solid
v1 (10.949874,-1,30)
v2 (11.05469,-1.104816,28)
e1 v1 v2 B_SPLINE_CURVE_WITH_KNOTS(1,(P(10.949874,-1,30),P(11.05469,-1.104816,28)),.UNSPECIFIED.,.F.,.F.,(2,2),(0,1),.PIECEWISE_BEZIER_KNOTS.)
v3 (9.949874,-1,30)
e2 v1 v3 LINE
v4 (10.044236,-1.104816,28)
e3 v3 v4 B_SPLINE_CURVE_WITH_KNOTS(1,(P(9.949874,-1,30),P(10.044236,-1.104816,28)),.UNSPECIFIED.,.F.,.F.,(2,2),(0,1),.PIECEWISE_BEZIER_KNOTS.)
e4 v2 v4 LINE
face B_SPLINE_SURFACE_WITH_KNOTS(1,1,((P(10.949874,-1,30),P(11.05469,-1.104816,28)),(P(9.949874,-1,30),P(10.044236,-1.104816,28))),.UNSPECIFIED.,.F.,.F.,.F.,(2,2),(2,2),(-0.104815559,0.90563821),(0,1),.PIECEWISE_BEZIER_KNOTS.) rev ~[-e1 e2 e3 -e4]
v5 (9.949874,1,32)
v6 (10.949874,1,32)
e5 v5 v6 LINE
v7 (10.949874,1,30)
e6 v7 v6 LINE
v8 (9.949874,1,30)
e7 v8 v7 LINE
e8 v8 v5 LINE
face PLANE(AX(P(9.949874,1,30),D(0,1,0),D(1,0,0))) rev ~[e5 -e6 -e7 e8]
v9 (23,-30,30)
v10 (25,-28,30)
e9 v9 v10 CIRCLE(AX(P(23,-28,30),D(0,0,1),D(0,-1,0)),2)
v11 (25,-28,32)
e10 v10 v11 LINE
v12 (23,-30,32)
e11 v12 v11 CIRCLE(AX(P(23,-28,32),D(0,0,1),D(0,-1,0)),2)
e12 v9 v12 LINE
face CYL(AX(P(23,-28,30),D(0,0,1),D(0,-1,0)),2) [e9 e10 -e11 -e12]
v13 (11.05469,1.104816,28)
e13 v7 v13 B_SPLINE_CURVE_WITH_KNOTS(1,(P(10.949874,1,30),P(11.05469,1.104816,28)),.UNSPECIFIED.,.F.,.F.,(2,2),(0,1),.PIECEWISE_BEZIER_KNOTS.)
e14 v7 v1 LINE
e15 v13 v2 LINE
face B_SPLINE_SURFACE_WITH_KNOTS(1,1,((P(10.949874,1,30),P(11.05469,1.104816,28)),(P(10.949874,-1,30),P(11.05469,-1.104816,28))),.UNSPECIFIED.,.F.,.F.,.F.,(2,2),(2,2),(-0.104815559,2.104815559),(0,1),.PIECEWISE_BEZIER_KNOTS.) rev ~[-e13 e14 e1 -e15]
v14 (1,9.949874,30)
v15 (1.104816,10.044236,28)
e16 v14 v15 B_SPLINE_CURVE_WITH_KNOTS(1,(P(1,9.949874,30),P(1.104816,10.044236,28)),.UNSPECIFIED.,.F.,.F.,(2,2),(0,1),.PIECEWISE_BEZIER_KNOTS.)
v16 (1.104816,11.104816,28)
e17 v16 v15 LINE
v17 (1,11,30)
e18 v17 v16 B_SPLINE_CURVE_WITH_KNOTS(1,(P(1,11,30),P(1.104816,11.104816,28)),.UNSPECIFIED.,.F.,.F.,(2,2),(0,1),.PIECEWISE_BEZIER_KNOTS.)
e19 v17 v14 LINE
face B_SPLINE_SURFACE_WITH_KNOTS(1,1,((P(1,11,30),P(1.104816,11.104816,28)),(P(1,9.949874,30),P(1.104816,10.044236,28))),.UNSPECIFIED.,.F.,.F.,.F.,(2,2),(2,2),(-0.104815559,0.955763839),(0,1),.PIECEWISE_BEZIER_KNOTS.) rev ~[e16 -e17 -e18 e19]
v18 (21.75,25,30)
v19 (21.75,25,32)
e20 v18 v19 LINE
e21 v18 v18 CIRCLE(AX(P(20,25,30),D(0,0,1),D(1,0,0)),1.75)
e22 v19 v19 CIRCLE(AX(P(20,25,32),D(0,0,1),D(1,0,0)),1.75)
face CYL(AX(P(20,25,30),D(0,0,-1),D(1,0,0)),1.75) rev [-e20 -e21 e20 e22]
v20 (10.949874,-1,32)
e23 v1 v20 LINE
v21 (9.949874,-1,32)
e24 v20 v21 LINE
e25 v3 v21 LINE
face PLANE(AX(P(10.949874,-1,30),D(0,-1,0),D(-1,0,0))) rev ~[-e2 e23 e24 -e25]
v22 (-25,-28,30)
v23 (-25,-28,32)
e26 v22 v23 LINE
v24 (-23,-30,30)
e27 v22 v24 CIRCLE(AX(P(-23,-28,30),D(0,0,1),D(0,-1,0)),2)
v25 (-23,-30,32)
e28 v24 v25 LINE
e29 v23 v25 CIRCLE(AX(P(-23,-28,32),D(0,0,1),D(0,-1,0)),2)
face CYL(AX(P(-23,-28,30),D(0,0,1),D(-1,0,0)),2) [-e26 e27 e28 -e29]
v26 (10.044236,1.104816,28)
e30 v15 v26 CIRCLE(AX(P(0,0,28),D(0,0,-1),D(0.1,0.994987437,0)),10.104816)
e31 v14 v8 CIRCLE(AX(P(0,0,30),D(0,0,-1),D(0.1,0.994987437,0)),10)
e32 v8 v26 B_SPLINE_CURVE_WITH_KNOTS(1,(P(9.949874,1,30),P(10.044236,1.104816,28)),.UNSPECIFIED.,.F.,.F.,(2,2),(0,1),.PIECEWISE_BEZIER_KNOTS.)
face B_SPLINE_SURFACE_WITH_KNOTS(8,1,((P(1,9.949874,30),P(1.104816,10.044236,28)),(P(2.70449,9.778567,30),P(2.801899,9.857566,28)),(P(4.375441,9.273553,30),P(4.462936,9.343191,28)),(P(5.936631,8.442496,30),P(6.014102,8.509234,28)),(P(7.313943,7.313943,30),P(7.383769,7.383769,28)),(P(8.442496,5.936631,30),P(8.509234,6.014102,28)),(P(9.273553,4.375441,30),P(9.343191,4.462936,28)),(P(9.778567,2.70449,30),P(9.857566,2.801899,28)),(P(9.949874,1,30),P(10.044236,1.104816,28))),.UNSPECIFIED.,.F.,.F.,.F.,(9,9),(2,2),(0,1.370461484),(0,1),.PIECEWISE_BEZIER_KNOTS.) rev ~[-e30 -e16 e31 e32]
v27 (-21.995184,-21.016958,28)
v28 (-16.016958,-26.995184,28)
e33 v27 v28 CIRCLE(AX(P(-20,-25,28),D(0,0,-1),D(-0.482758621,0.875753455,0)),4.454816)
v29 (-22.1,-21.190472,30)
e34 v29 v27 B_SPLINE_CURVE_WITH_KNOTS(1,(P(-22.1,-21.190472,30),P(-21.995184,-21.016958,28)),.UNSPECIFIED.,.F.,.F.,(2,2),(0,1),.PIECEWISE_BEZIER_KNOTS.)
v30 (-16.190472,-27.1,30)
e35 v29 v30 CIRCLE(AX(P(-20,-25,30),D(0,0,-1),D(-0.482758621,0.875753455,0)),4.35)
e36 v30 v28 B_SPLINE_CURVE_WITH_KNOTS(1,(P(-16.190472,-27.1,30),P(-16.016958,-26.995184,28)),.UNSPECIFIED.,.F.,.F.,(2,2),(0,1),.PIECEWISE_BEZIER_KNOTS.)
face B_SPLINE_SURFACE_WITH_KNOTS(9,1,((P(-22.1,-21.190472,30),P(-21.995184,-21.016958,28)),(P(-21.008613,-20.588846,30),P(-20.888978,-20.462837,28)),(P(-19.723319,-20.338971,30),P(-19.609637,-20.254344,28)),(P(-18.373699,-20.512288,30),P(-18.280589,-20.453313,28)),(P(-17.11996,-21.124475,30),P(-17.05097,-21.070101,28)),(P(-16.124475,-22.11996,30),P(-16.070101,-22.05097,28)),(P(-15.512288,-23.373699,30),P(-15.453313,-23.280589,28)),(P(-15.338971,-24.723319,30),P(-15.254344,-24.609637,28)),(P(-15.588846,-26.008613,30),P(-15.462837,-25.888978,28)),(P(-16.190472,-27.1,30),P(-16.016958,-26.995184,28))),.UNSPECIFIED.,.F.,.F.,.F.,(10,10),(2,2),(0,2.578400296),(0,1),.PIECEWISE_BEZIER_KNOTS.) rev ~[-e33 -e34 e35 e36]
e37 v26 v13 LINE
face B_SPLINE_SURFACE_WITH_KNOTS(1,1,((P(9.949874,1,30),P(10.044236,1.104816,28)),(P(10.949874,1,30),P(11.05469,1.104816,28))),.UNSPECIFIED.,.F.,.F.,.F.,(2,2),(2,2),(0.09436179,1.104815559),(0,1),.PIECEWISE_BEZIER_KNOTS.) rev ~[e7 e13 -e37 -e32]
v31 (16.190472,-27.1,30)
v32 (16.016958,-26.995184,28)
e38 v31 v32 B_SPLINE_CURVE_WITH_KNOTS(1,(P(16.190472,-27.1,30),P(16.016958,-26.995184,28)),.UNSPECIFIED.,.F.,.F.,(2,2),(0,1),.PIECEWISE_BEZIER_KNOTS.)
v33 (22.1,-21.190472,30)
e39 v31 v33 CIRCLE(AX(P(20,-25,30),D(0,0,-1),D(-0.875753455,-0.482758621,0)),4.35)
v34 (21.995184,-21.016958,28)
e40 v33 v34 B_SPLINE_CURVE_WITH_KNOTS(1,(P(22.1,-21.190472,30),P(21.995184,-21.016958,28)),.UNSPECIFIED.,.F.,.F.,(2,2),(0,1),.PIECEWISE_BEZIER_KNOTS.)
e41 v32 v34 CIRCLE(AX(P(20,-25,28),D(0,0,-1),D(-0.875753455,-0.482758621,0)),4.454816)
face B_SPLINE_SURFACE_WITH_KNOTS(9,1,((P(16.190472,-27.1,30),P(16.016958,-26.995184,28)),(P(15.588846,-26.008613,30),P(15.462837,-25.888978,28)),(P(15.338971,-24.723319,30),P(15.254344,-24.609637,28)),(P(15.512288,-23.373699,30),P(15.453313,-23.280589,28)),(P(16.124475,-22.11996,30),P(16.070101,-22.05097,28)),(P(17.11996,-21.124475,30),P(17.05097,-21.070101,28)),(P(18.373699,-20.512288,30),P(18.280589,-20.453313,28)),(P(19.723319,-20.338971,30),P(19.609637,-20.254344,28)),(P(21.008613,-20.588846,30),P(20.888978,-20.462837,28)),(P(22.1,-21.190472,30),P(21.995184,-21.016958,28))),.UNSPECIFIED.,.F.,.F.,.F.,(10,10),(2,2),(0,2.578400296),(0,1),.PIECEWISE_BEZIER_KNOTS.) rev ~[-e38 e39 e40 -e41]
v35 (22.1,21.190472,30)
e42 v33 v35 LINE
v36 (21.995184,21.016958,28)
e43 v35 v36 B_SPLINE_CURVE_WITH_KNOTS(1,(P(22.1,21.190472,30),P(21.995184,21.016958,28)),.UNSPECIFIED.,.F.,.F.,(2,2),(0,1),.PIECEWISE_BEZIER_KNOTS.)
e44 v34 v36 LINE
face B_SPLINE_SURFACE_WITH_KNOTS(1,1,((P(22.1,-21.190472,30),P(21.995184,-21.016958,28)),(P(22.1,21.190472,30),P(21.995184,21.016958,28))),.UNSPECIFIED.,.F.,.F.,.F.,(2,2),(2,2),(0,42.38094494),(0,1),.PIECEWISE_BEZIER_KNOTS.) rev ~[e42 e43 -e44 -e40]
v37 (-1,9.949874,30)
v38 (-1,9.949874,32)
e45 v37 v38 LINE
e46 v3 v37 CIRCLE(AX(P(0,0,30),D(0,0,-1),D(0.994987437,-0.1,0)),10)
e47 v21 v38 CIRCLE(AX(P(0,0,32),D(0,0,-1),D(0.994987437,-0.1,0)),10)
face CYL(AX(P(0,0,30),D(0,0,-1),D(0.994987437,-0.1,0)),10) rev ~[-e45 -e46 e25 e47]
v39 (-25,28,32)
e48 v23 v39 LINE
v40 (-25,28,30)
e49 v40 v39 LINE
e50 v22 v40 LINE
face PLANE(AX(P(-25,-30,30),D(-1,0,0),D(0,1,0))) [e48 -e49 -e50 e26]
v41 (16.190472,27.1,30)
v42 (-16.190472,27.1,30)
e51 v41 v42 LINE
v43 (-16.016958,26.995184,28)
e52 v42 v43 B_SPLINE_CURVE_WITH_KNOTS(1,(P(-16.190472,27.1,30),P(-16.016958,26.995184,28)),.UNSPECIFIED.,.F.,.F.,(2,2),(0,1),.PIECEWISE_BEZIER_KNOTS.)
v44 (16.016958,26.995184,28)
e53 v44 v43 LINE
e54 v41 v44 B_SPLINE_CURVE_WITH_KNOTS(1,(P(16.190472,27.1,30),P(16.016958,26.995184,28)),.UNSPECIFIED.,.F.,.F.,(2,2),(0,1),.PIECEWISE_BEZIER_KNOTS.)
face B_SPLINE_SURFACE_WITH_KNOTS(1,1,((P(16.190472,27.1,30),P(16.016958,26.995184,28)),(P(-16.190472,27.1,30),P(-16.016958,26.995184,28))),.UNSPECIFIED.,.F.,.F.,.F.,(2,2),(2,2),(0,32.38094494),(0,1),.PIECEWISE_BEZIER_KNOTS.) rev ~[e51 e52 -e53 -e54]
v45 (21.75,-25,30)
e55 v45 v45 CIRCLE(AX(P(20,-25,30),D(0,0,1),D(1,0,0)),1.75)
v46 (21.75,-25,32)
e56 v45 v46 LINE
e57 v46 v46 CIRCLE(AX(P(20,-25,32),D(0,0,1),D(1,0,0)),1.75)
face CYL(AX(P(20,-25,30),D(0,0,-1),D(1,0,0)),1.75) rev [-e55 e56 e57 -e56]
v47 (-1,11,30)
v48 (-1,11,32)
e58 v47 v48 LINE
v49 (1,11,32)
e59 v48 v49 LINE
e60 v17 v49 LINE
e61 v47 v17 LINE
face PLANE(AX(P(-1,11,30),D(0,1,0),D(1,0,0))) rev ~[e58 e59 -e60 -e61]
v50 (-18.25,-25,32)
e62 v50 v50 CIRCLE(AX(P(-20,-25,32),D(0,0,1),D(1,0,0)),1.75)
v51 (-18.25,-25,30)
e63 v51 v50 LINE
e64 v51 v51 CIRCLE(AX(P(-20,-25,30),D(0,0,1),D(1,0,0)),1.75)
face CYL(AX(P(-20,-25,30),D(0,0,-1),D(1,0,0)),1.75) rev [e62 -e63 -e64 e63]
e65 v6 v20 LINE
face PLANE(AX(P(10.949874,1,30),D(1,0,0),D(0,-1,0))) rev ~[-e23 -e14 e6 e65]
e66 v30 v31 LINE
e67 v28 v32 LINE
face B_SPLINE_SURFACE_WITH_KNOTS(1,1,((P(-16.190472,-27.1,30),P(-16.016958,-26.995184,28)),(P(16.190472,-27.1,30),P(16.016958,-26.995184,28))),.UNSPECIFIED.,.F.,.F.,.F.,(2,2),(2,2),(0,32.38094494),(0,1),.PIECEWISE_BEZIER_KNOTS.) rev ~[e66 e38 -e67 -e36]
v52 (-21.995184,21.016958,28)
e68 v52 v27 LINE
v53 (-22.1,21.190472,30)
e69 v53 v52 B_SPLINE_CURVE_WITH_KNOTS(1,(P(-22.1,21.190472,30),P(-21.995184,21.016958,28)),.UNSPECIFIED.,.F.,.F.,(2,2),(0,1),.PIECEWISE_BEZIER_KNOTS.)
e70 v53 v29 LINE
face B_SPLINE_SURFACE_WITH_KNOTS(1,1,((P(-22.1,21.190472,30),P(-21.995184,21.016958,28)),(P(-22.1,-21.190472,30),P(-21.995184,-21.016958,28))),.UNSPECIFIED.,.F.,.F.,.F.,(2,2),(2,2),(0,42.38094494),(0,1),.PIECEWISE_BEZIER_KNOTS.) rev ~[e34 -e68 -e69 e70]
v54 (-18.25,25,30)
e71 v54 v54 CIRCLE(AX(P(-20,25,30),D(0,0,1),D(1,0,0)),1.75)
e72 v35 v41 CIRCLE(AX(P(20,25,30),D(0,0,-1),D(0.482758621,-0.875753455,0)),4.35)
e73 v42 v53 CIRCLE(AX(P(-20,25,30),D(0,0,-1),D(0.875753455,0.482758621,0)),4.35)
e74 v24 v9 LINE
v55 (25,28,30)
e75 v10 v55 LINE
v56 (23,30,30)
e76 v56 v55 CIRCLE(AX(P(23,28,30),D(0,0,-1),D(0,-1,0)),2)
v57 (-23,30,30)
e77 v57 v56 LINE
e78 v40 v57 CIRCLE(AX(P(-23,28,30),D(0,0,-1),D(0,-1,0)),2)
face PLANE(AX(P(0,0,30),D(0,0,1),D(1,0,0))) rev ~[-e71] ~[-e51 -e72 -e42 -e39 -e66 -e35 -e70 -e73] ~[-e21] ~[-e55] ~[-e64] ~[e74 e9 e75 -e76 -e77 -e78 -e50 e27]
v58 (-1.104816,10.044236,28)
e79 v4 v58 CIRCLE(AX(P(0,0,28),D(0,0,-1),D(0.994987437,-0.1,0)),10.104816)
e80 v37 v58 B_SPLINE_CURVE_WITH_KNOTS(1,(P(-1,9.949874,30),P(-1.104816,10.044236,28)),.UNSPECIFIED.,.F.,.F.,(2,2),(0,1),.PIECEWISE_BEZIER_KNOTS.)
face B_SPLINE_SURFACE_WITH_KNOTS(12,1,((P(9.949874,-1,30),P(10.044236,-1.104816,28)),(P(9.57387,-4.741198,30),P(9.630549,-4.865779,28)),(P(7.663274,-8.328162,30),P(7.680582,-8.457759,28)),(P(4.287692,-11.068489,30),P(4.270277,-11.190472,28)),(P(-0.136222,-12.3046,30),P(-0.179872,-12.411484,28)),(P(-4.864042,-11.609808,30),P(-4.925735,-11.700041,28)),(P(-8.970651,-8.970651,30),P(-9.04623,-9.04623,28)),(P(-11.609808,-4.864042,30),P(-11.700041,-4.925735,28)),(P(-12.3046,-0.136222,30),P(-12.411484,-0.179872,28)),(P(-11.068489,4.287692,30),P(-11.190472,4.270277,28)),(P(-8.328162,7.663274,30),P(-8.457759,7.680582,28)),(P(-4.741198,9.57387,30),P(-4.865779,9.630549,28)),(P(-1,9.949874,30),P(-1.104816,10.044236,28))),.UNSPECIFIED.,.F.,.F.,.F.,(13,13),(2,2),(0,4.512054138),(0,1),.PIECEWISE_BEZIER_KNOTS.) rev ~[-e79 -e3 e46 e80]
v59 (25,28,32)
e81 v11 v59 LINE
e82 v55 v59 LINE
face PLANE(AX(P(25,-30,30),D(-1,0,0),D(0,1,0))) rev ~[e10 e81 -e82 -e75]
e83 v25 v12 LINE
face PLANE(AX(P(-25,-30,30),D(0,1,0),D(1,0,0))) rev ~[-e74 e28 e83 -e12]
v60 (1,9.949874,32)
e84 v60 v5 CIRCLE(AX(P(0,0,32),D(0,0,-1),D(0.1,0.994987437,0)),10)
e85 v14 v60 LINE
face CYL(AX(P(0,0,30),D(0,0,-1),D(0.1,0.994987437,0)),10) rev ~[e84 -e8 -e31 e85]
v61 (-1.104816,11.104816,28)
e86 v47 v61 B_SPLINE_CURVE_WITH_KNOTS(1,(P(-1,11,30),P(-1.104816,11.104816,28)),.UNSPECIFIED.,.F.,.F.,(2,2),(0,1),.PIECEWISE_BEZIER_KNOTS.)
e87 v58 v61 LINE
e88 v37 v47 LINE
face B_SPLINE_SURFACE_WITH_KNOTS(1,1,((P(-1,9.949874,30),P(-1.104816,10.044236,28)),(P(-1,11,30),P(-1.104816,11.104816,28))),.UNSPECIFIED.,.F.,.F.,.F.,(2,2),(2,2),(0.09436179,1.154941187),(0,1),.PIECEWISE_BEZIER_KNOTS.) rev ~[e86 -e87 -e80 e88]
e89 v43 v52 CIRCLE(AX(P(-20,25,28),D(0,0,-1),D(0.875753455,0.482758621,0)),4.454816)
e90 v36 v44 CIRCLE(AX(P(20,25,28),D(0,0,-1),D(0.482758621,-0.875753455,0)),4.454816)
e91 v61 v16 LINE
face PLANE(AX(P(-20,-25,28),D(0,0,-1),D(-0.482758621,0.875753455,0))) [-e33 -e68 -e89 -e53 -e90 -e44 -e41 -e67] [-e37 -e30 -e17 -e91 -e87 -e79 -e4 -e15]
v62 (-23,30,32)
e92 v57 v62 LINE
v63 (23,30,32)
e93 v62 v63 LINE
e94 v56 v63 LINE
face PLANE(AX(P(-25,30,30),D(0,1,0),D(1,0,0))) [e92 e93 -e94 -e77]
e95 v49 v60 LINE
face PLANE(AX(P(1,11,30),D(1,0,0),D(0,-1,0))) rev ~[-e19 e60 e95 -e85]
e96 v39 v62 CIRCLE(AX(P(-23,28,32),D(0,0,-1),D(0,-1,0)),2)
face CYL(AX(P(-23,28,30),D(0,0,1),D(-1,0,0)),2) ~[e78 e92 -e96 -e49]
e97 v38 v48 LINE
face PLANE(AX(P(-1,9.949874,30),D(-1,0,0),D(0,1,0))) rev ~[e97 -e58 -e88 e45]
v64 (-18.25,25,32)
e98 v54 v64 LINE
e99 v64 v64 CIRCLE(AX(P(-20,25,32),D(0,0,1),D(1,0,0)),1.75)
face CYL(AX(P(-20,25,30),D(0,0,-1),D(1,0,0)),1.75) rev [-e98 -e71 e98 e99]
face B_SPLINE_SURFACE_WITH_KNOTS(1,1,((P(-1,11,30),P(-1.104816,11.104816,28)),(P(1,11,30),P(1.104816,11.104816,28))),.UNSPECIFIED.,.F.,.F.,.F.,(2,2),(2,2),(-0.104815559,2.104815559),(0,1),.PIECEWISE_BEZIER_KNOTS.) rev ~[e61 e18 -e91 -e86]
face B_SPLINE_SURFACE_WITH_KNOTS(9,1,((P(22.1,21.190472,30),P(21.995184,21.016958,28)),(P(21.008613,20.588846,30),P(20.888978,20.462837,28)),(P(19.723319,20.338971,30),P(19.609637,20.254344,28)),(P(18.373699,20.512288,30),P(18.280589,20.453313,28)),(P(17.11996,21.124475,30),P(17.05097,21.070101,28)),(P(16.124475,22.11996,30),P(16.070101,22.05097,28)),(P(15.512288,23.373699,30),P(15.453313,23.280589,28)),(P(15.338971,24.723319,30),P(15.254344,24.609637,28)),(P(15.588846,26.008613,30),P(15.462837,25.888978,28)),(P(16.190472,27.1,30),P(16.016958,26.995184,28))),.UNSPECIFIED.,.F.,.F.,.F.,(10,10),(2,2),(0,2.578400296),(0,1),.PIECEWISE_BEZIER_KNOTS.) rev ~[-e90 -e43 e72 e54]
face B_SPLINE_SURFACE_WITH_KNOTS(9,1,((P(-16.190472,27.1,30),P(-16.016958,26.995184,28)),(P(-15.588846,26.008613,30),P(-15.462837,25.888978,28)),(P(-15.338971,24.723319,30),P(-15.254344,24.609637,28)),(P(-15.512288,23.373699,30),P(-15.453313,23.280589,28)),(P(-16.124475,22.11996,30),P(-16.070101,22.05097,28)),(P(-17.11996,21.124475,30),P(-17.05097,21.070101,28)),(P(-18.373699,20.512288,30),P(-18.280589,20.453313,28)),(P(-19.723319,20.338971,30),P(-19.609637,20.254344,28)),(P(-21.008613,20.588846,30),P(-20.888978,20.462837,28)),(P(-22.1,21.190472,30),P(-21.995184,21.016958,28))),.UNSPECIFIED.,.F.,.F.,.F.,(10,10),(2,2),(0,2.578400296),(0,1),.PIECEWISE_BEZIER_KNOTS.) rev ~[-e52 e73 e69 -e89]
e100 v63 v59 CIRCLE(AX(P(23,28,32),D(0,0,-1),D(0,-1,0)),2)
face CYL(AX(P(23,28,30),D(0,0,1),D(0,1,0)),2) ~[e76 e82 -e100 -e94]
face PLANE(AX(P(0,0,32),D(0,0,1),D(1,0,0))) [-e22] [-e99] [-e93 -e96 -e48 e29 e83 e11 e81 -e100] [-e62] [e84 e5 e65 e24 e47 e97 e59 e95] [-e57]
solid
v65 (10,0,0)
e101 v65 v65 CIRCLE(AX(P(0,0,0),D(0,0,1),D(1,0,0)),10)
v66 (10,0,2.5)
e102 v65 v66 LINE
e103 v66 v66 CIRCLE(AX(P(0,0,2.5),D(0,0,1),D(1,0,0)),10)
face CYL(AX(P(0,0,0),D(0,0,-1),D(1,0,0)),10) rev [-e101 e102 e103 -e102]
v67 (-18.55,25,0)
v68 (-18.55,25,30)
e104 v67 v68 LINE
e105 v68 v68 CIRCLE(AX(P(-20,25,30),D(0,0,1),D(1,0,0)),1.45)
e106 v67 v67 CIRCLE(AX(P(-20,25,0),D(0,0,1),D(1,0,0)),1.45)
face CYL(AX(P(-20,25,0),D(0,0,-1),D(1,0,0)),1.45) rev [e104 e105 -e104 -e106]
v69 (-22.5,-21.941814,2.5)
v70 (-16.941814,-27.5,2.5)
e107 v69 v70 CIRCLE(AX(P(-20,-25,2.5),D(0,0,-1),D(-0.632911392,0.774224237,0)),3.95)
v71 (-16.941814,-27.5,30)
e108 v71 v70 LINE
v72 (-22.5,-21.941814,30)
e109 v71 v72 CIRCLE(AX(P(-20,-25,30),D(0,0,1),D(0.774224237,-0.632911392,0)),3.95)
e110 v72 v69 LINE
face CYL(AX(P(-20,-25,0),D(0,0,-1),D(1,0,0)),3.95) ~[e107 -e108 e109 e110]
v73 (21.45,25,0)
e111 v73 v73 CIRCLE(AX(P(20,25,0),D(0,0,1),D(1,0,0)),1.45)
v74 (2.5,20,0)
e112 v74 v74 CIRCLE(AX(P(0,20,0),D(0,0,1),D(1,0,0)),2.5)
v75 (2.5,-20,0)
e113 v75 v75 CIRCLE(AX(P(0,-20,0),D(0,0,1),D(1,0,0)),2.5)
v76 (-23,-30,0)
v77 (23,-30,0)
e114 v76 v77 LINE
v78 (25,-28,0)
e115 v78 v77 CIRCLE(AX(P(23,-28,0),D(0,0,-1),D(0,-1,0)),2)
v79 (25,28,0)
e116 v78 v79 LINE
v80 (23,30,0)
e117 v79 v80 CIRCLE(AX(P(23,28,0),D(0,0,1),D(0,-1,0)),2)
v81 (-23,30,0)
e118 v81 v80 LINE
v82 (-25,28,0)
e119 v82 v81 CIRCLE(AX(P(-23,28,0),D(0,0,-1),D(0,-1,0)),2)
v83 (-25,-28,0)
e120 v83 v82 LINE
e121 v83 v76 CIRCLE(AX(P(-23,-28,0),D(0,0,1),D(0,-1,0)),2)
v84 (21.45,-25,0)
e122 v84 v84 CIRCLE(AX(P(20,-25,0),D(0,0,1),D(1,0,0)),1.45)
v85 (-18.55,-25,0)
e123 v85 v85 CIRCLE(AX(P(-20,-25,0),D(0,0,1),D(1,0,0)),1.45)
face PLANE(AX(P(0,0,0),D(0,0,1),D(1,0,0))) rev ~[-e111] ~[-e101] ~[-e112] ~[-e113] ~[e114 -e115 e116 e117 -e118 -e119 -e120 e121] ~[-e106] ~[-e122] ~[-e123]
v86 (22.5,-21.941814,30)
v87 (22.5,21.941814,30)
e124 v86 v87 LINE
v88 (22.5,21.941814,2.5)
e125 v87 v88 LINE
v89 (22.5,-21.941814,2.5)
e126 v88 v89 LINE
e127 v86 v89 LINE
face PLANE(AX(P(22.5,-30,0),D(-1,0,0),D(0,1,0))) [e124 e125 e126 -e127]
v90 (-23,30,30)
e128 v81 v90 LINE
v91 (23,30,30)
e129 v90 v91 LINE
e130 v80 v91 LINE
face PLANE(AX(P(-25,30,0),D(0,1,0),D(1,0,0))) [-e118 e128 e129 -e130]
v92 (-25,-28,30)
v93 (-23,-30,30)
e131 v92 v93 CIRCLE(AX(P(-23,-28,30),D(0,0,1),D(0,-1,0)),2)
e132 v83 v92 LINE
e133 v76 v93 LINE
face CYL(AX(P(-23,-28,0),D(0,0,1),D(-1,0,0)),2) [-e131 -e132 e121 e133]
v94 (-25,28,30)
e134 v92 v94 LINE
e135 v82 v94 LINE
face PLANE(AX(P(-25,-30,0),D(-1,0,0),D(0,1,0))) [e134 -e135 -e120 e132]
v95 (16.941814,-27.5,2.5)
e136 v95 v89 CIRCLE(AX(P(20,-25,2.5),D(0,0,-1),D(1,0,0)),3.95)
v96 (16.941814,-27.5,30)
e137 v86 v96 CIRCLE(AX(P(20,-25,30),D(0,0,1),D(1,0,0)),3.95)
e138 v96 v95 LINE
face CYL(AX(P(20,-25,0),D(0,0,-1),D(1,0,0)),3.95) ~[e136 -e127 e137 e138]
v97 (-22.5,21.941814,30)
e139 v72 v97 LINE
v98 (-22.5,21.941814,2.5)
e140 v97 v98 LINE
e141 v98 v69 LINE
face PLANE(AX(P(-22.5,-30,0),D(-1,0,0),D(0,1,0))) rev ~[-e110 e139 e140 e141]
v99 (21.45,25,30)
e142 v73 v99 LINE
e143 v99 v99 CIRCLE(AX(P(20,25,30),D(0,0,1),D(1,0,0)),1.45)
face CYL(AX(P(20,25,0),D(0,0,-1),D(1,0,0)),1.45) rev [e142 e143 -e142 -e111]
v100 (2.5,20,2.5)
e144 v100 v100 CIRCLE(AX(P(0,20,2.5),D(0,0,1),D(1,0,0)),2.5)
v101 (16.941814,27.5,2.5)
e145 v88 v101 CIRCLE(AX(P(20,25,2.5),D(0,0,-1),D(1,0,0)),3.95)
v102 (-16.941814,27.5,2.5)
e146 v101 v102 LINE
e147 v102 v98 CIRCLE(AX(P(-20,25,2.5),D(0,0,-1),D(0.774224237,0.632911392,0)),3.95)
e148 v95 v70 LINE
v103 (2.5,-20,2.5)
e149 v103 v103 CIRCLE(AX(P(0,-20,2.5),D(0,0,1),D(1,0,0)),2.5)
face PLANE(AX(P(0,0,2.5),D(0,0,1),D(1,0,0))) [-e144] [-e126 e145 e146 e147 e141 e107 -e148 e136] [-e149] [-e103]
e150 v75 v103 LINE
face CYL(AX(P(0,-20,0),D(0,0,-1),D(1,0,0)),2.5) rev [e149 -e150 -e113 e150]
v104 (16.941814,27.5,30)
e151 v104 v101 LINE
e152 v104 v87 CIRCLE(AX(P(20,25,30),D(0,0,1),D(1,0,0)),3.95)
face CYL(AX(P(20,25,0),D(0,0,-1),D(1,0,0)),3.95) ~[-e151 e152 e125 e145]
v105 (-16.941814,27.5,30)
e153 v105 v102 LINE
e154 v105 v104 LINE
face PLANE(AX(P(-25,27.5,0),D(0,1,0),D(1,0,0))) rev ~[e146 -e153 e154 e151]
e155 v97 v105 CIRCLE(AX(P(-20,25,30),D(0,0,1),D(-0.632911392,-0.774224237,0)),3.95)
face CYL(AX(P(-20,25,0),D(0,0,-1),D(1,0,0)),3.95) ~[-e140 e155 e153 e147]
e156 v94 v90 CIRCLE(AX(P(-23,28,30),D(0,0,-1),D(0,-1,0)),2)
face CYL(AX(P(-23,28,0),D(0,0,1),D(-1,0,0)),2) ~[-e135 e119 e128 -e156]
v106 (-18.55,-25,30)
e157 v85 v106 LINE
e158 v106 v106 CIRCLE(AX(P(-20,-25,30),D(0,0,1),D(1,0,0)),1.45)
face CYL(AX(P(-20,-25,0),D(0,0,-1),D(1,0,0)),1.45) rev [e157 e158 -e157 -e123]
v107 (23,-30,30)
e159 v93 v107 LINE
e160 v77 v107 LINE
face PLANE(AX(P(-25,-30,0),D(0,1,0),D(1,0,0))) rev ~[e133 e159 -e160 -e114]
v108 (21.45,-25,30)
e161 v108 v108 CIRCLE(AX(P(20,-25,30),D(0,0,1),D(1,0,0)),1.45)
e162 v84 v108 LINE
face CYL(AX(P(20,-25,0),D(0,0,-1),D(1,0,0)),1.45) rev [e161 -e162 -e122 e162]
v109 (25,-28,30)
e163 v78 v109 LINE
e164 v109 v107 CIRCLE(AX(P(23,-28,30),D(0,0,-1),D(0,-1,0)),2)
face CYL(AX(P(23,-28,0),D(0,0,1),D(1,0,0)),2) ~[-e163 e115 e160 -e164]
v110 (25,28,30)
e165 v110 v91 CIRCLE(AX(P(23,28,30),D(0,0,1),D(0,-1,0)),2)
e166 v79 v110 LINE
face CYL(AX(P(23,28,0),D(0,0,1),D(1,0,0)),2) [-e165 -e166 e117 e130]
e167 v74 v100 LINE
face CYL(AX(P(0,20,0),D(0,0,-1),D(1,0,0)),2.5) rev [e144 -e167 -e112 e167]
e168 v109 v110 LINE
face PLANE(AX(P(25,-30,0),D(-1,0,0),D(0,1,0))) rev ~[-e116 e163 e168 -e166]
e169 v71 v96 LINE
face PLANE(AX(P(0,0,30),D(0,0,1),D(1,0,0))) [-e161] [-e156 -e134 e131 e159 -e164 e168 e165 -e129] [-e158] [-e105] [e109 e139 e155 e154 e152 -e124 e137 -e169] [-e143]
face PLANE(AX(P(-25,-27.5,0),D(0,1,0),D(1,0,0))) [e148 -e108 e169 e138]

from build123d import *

# Parameters (mm, degrees)
F0_W     = 50
F0_H     = 60
F0_R     = 1.45
F0_R_2   = 2.5
F0_R_3   = 10
F1_DEPTH = 30
F2_T     = -2.5
F4_DEPTH = 2
F4_TAPER = 3
F3_W     = 50
F3_H     = 60
F3_R     = 1.75
F5_DEPTH = 2
F6_R     = 2
F6_2_R   = 2


with BuildPart() as f1:
    # F0 (on Top) → F1 (new body)
    with BuildSketch(Plane.XY):
        Rectangle(F0_W, F0_H)
        with Locations((-20, -25)):
            Circle(F0_R, mode=Mode.SUBTRACT)
        with Locations((0, -20)):
            Circle(F0_R_2, mode=Mode.SUBTRACT)
        with Locations((20, -25)):
            Circle(F0_R, mode=Mode.SUBTRACT)
        with Locations((-20, 25)):
            Circle(F0_R, mode=Mode.SUBTRACT)
        Circle(F0_R_3, mode=Mode.SUBTRACT)
        with Locations((0, 20)):
            Circle(F0_R_2, mode=Mode.SUBTRACT)
        with Locations((20, 25)):
            Circle(F0_R, mode=Mode.SUBTRACT)
    extrude(amount=F1_DEPTH)

    # F2
    f2_openings = [f1.faces().sort_by_distance(p)[0] for p in [
        (-10, 0, 15),
        (0, -29.218975, 30),
        (-2.5, 20, 15),
        (-2.5, -20, 15),
    ]]
    offset(amount=F2_T, openings=f2_openings)

    # F6
    f6_edges = [f1.edges().sort_by_distance(p)[0] for p in [
        (25, 30, 15),
        (25, -30, 15),
        (-25, 30, 15),
        (-25, -30, 15),
    ]]
    fillet(f6_edges, radius=F6_R)


with BuildPart() as f4:
    # F3 (on face) → F4 (new body)
    with BuildSketch(Plane.XY.offset(30)):
        with BuildLine():
            ThreePointArc((-22.1, -21.1904724702), (-16.9240855018, -21.9240855018), (-16.1904724702, -27.1))
            Line((-16.1904724702, -27.1), (16.1904724702, -27.1))
            ThreePointArc((16.1904724702, -27.1), (16.9240855018, -21.9240855018), (22.1, -21.1904724702))
            Line((22.1, -21.1904724702), (22.1, 21.1904724702))
            ThreePointArc((22.1, 21.1904724702), (16.9240855018, 21.9240855018), (16.1904724702, 27.1))
            Line((16.1904724702, 27.1), (-16.1904724702, 27.1))
            ThreePointArc((-16.1904724702, 27.1), (-16.9240855018, 21.9240855018), (-22.1, 21.1904724702))
            Line((-22.1, 21.1904724702), (-22.1, -21.1904724702))
        make_face()
        with BuildLine():
            ThreePointArc((9.9498743711, -1), (-7.0710678119, -7.0710678119), (-1, 9.9498743711))
            Line((-1, 9.9498743711), (-1, 11))
            Line((-1, 11), (1, 11))
            Line((1, 11), (1, 9.9498743711))
            ThreePointArc((1, 9.9498743711), (7.0710678119, 7.0710678119), (9.9498743711, 1))
            Line((9.9498743711, 1), (10.9498743711, 1))
            Line((10.9498743711, 1), (10.9498743711, -1))
            Line((10.9498743711, -1), (9.9498743711, -1))
        make_face(mode=Mode.SUBTRACT)
    extrude(amount=-F4_DEPTH, taper=F4_TAPER)

    # F3 (on face) → F5 (join)
    with BuildSketch(Plane.XY.offset(30)):
        Rectangle(F3_W, F3_H)
        with Locations((-20, -25)):
            Circle(F3_R, mode=Mode.SUBTRACT)
        with Locations((20, -25)):
            Circle(F3_R, mode=Mode.SUBTRACT)
        with Locations((-20, 25)):
            Circle(F3_R, mode=Mode.SUBTRACT)
        with BuildLine():
            ThreePointArc((-16.05, -25), (-18.3077381999, -21.4308614485), (-22.5, -21.9418142633))
            Line((-22.5, -21.9418142633), (-22.5, 21.9418142633))
            ThreePointArc((-22.5, 21.9418142633), (-18.3077381999, 21.4308614485), (-16.05, 25))
            ThreePointArc((-16.05, 25), (-16.2796281328, 26.3271522784), (-16.9418142633, 27.5))
            Line((-16.9418142633, 27.5), (16.9418142633, 27.5))
            ThreePointArc((16.9418142633, 27.5), (17.2069282143, 22.2069282143), (22.5, 21.9418142633))
            Line((22.5, 21.9418142633), (22.5, -21.9418142633))
            ThreePointArc((22.5, -21.9418142633), (17.2069282143, -22.2069282143), (16.9418142633, -27.5))
            Line((16.9418142633, -27.5), (-16.9418142633, -27.5))
            ThreePointArc((-16.9418142633, -27.5), (-16.2796281328, -26.3271522784), (-16.05, -25))
        make_face(mode=Mode.SUBTRACT)
        with Locations((20, 25)):
            Circle(F3_R, mode=Mode.SUBTRACT)
        with BuildLine():
            Line((-22.5, 21.9418142633), (-22.5, -21.9418142633))
            ThreePointArc((-22.5, -21.9418142633), (-18.3077381999, -21.4308614485), (-16.05, -25))
            ThreePointArc((-16.05, -25), (-16.2796281328, -26.3271522784), (-16.9418142633, -27.5))
            Line((-16.9418142633, -27.5), (16.9418142633, -27.5))
            ThreePointArc((16.9418142633, -27.5), (17.2069282143, -22.2069282143), (22.5, -21.9418142633))
            Line((22.5, -21.9418142633), (22.5, 21.9418142633))
            ThreePointArc((22.5, 21.9418142633), (17.2069282143, 22.2069282143), (16.9418142633, 27.5))
            Line((16.9418142633, 27.5), (-16.9418142633, 27.5))
            ThreePointArc((-16.9418142633, 27.5), (-16.2796281328, 26.3271522784), (-16.05, 25))
            ThreePointArc((-16.05, 25), (-18.3077381999, 21.4308614485), (-22.5, 21.9418142633))
        make_face()
        with BuildLine():
            Line((16.1904724702, -27.1), (-16.1904724702, -27.1))
            ThreePointArc((-16.1904724702, -27.1), (-16.9240855018, -21.9240855018), (-22.1, -21.1904724702))
            Line((-22.1, -21.1904724702), (-22.1, 21.1904724702))
            ThreePointArc((-22.1, 21.1904724702), (-16.9240855018, 21.9240855018), (-16.1904724702, 27.1))
            Line((-16.1904724702, 27.1), (16.1904724702, 27.1))
            ThreePointArc((16.1904724702, 27.1), (16.9240855018, 21.9240855018), (22.1, 21.1904724702))
            Line((22.1, 21.1904724702), (22.1, -21.1904724702))
            ThreePointArc((22.1, -21.1904724702), (16.9240855018, -21.9240855018), (16.1904724702, -27.1))
        make_face(mode=Mode.SUBTRACT)
        with BuildLine():
            ThreePointArc((-22.1, -21.1904724702), (-16.9240855018, -21.9240855018), (-16.1904724702, -27.1))
            Line((-16.1904724702, -27.1), (16.1904724702, -27.1))
            ThreePointArc((16.1904724702, -27.1), (16.9240855018, -21.9240855018), (22.1, -21.1904724702))
            Line((22.1, -21.1904724702), (22.1, 21.1904724702))
            ThreePointArc((22.1, 21.1904724702), (16.9240855018, 21.9240855018), (16.1904724702, 27.1))
            Line((16.1904724702, 27.1), (-16.1904724702, 27.1))
            ThreePointArc((-16.1904724702, 27.1), (-16.9240855018, 21.9240855018), (-22.1, 21.1904724702))
            Line((-22.1, 21.1904724702), (-22.1, -21.1904724702))
        make_face()
        with BuildLine():
            ThreePointArc((9.9498743711, -1), (-7.0710678119, -7.0710678119), (-1, 9.9498743711))
            Line((-1, 9.9498743711), (-1, 11))
            Line((-1, 11), (1, 11))
            Line((1, 11), (1, 9.9498743711))
            ThreePointArc((1, 9.9498743711), (7.0710678119, 7.0710678119), (9.9498743711, 1))
            Line((9.9498743711, 1), (10.9498743711, 1))
            Line((10.9498743711, 1), (10.9498743711, -1))
            Line((10.9498743711, -1), (9.9498743711, -1))
        make_face(mode=Mode.SUBTRACT)
    extrude(amount=F5_DEPTH)

    # F6#2
    f6_2_edges = [f4.edges().sort_by_distance(p)[0] for p in [
        (25, 30, 31),
        (25, -30, 31),
        (-25, 30, 31),
        (-25, -30, 31),
    ]]
    fillet(f6_2_edges, radius=F6_2_R)


solid = Compound([f1.part, f4.part])
